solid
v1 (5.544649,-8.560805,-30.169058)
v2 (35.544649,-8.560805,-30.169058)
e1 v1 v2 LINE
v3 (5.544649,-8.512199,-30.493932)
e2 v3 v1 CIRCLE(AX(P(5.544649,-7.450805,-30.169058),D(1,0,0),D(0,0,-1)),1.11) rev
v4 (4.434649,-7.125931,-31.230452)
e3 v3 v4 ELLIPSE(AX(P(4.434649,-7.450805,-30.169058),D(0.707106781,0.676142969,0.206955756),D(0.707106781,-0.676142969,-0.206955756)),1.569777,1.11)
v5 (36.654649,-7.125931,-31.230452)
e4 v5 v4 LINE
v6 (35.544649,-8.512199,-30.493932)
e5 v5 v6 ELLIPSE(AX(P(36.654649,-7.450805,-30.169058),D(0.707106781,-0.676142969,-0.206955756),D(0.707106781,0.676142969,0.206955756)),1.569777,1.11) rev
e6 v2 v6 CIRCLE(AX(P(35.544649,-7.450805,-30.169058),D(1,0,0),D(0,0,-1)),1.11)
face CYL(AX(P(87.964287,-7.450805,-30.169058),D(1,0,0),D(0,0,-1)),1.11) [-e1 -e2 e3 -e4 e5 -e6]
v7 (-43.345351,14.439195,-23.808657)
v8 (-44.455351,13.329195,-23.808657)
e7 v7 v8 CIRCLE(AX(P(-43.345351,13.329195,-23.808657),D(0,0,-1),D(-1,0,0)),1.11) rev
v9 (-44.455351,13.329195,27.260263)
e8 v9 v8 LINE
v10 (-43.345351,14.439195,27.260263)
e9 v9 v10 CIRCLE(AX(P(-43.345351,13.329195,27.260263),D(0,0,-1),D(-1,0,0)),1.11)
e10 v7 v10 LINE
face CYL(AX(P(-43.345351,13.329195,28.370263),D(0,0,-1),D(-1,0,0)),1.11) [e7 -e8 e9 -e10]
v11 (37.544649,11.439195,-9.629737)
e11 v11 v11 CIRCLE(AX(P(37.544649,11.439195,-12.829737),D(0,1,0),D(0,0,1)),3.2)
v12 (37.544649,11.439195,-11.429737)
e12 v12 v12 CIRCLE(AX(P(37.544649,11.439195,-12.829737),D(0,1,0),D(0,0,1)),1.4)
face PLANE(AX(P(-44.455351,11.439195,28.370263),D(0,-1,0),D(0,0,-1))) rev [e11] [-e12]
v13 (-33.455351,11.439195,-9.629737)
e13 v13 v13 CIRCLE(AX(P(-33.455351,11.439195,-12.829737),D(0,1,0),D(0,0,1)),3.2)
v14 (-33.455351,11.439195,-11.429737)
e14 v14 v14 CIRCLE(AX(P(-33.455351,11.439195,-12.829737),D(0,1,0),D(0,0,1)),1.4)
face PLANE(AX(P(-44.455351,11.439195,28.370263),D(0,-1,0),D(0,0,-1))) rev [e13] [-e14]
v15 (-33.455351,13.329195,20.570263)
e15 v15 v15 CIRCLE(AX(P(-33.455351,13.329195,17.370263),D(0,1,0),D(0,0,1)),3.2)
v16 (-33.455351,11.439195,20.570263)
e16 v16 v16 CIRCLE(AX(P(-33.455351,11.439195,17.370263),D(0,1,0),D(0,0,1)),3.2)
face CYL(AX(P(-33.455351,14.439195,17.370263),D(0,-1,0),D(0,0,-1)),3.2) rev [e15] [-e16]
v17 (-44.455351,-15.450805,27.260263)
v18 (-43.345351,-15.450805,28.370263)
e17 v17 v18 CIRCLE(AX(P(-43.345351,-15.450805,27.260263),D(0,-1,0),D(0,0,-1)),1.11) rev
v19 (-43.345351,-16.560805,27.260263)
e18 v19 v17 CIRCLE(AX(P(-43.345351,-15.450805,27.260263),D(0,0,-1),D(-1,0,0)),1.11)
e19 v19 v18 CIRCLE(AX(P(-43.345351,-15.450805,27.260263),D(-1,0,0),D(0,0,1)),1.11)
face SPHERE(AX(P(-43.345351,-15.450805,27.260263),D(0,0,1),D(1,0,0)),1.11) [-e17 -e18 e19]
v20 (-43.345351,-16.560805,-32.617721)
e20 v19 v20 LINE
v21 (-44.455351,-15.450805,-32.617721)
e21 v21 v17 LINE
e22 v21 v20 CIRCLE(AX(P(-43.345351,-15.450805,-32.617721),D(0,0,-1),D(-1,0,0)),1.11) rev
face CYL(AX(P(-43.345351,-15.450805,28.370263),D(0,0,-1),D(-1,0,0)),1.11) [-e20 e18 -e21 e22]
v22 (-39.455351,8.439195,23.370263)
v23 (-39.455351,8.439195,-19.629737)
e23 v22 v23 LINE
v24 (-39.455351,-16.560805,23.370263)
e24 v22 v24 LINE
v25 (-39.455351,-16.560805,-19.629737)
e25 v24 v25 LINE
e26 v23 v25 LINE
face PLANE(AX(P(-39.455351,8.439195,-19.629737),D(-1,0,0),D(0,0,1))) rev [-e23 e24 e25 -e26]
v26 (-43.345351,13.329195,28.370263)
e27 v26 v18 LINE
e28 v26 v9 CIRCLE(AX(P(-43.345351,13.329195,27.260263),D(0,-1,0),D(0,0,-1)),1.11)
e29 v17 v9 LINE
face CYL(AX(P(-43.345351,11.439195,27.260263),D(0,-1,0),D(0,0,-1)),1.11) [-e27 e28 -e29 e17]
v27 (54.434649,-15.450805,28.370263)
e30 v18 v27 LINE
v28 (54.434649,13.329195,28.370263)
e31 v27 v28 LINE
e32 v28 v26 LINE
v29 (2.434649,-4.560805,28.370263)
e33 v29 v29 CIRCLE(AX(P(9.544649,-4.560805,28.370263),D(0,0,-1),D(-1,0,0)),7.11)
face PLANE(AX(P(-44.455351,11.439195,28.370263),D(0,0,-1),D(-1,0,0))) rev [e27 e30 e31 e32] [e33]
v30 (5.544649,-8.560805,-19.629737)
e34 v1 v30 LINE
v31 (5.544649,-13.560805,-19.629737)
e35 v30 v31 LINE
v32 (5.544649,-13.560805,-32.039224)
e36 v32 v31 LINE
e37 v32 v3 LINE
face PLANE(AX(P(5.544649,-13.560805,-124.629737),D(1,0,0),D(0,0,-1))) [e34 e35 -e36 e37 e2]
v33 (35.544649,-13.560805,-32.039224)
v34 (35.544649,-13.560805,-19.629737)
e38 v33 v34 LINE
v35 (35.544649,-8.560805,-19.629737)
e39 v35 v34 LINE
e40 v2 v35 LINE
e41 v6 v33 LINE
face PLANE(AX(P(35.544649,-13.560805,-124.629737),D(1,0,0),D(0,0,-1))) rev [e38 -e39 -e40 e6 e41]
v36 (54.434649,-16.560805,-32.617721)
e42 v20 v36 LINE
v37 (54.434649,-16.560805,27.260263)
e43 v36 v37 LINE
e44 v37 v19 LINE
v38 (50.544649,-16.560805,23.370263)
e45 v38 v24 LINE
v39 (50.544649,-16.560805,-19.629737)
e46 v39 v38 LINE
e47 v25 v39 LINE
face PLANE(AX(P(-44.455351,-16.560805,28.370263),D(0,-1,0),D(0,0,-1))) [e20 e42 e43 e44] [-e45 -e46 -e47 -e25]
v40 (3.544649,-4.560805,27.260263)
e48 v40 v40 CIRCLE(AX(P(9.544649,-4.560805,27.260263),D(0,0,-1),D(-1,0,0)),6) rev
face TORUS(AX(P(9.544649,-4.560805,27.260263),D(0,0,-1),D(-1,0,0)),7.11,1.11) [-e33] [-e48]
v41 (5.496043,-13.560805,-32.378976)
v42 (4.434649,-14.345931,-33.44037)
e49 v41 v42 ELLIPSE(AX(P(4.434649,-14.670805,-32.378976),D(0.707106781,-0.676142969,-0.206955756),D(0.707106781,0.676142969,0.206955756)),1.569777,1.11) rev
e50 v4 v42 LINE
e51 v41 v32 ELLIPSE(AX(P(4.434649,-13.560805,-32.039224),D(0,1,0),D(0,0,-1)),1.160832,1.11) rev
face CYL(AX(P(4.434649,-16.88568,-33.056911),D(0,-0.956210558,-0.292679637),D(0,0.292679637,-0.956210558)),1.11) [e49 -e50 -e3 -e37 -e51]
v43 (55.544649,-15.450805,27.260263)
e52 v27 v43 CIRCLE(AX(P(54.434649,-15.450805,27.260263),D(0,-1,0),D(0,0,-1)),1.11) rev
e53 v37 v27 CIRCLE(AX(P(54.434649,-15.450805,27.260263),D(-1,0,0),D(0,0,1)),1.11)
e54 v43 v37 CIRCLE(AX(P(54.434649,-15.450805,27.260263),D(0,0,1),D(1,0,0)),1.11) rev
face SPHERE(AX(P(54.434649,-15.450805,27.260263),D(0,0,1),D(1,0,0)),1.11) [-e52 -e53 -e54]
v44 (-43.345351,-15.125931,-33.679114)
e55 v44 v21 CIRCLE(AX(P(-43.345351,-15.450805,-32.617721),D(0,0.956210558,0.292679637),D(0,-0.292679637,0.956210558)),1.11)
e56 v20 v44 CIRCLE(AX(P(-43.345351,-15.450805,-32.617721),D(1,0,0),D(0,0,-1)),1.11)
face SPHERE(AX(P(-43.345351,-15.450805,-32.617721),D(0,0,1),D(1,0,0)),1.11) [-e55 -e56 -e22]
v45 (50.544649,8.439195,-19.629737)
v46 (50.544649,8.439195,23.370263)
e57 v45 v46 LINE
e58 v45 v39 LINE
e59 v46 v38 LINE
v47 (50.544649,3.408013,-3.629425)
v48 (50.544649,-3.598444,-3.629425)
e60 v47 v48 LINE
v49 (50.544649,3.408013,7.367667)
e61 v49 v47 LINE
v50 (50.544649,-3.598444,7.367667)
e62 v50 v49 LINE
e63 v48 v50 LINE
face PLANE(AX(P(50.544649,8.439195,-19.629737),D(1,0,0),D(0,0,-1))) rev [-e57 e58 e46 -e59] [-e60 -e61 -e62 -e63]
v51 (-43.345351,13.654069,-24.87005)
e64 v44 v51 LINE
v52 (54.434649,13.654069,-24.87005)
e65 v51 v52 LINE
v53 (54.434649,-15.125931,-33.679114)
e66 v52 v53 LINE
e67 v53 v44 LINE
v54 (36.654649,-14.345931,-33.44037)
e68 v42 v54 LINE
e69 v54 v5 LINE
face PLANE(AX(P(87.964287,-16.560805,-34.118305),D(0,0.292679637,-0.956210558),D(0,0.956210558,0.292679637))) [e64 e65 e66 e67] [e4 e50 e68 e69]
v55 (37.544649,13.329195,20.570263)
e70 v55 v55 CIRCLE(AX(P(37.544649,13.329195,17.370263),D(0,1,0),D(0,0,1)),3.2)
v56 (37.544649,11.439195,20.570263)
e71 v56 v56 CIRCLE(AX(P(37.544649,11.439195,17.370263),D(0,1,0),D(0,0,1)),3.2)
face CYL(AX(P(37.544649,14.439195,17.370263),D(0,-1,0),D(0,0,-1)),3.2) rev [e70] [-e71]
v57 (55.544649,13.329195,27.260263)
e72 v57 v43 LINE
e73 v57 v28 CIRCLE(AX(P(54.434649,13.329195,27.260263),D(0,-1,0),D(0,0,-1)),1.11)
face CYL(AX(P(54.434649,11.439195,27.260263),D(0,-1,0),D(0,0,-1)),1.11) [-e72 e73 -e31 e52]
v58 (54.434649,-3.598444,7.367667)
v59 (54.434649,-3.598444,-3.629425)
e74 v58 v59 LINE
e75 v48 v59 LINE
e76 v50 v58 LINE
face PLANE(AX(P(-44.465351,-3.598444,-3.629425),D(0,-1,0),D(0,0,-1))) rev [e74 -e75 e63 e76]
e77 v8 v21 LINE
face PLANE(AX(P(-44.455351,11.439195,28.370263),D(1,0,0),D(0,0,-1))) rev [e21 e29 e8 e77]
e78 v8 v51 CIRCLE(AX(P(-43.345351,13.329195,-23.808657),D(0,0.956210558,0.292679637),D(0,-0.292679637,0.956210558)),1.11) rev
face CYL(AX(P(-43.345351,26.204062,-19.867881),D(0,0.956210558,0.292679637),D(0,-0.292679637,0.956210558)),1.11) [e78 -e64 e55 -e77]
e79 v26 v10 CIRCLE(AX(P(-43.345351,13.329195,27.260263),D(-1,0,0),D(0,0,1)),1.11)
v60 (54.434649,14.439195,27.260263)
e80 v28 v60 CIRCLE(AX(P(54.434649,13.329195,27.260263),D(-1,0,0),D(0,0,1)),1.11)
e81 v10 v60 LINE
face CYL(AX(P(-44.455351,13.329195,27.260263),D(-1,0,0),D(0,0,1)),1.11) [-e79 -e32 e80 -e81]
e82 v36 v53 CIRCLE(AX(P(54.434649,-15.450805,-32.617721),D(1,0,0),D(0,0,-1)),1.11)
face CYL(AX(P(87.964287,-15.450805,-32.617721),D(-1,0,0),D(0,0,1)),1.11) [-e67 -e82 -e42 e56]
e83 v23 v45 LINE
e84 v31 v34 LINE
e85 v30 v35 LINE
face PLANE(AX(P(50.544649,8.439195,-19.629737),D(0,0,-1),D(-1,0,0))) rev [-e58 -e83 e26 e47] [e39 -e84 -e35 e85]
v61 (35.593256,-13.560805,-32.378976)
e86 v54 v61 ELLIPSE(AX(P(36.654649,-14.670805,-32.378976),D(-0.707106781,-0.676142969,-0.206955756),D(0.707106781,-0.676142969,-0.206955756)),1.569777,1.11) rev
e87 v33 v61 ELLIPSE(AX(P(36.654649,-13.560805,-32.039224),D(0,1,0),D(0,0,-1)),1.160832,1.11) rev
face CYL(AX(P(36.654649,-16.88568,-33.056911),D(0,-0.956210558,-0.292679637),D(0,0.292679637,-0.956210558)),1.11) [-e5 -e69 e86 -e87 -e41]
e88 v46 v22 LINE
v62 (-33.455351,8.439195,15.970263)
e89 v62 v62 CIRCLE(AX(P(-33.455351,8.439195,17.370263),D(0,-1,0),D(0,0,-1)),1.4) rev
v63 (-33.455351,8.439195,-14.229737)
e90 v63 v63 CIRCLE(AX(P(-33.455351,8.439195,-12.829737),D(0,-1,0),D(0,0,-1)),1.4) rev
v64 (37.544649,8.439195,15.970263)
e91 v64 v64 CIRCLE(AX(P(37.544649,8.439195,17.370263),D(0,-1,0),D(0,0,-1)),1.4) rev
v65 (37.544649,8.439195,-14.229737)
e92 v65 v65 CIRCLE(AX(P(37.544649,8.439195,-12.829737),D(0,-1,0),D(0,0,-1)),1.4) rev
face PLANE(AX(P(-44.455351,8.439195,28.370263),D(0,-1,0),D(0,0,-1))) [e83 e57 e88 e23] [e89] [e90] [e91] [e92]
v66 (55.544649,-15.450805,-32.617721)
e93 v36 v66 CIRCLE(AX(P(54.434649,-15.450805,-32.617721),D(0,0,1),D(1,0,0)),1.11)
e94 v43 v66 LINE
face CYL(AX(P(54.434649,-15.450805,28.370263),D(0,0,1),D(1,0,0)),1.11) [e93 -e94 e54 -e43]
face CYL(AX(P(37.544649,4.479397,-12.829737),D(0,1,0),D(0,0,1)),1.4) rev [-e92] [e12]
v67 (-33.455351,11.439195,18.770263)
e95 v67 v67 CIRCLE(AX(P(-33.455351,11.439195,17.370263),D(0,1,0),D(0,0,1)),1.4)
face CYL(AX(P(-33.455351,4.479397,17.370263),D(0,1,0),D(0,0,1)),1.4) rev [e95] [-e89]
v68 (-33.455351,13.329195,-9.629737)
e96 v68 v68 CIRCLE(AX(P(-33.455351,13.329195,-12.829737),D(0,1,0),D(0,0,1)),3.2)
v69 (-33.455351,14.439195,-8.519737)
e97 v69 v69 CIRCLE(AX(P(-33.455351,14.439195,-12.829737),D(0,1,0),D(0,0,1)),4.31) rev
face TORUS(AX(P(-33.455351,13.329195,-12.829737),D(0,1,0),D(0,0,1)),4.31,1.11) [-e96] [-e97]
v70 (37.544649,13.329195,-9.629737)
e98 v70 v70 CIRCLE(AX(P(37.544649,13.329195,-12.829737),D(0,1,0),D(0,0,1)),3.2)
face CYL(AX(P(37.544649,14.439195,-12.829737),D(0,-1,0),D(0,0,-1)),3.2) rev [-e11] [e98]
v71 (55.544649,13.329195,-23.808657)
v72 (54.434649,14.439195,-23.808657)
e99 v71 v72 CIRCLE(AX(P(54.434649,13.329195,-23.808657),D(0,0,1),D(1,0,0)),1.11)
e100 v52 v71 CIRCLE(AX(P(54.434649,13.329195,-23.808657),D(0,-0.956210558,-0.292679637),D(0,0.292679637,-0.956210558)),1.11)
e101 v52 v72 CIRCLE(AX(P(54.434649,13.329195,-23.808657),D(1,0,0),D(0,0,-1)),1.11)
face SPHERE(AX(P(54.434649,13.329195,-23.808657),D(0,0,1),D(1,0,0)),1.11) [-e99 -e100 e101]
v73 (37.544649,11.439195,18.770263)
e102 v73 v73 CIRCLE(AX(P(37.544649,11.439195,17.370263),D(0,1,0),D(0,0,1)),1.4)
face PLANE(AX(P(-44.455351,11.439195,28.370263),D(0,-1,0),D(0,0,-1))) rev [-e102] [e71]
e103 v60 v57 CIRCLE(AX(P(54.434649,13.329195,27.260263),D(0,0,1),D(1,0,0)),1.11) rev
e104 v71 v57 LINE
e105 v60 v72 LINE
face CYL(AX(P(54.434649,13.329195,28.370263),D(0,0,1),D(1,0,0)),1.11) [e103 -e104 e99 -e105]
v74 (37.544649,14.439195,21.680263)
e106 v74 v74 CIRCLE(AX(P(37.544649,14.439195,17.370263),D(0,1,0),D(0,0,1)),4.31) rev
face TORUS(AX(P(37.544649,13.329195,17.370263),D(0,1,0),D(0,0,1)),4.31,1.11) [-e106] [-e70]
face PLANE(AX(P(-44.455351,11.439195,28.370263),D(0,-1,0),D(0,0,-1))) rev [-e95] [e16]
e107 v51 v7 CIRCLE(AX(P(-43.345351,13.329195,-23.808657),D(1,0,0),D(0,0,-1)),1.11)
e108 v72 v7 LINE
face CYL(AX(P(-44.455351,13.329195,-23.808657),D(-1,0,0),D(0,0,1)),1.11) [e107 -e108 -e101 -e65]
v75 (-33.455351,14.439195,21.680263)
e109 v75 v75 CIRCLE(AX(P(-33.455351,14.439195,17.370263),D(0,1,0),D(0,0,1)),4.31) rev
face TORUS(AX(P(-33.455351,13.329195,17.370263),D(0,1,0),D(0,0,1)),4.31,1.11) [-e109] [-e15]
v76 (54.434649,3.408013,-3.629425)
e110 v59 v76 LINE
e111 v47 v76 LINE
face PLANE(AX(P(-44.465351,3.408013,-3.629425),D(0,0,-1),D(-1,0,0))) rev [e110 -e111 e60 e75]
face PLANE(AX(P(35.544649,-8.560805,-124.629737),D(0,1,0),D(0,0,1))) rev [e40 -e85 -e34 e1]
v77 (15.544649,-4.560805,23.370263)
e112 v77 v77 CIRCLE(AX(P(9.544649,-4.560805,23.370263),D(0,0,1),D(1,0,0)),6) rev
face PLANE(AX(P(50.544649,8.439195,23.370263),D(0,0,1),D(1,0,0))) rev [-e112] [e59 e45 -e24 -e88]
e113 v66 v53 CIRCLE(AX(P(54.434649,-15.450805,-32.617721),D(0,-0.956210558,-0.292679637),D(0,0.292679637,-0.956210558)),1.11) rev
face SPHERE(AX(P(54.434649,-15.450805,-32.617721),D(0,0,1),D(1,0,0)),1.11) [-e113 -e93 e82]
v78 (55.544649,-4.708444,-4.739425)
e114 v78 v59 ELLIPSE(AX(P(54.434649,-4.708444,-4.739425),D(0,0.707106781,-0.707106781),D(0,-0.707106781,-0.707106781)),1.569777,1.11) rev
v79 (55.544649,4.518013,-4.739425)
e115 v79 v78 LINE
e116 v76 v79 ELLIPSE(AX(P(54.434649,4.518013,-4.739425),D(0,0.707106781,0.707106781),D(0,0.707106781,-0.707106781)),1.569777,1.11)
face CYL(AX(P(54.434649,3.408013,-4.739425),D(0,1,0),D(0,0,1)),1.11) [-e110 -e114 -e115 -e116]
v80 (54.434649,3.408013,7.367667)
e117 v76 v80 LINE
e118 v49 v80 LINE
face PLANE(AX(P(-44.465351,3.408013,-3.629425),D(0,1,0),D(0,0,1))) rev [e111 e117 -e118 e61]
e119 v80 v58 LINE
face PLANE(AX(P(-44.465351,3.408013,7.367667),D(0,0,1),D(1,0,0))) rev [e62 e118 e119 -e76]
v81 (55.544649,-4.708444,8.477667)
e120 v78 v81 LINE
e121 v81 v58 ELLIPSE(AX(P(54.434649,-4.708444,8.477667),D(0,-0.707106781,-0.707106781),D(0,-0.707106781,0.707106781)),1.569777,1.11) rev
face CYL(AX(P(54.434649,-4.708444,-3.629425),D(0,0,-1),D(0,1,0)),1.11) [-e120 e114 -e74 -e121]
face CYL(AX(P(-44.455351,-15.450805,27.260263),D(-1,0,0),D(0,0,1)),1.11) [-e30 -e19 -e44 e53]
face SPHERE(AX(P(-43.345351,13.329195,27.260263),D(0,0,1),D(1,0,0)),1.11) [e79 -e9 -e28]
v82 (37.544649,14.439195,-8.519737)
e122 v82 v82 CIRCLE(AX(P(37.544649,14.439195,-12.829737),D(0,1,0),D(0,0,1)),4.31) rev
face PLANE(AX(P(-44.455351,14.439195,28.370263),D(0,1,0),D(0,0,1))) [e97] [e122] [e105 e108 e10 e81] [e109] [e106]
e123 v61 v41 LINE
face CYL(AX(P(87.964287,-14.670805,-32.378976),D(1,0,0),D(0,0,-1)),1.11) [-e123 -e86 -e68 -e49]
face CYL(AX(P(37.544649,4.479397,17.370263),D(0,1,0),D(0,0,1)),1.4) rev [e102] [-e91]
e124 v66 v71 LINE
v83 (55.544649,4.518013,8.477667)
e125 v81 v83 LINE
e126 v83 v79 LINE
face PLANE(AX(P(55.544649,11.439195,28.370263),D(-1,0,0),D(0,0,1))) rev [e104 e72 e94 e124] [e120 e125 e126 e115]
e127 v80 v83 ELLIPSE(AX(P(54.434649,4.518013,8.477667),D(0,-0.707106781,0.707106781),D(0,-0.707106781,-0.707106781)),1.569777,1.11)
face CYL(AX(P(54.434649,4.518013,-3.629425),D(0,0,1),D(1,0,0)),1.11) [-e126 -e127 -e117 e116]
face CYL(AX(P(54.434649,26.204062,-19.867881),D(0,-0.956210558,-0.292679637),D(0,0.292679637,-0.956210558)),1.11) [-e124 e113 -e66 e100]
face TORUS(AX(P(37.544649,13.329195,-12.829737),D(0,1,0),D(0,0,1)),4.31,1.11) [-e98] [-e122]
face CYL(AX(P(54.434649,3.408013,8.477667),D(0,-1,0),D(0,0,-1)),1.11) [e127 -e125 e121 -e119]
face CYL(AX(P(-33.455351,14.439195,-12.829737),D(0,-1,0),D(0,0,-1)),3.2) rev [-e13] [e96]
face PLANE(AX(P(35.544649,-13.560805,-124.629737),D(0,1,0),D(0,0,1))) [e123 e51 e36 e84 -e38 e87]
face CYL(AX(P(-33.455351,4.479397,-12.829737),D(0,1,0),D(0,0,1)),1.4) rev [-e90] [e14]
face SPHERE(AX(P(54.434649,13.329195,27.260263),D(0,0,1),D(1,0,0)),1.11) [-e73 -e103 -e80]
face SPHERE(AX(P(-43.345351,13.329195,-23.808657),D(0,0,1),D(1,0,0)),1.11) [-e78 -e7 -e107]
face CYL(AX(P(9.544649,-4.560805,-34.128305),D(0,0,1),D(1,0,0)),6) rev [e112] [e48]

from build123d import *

# Parameters (mm, degrees)
SKETCH_1_W                      = 10
SKETCH_1_H                      = 5.3
EXTRUDE_1_DEPTH                 = 2.8
CUT_EXTRUDE_1_DEPTH             = 2.5
SKETCH_4_R                      = 0.13999999999999993
SKETCH_4_R_2                    = 0.13999999999999987
CUT_EXTRUDE_2_DEPTH             = 0.3
CUT_EXTRUDE_3_REACH             = 13.659
CUT_EXTRUDE_4_REACH             = 13.659
SKETCH_7_W                      = 3
SKETCH_7_H                      = 0.5
CUT_EXTRUDE_4_DIRECTION_2_DEPTH = 10
SKETCH_8_W                      = 10
SKETCH_8_H                      = 5.3
SKETCH_8_R                      = 0.3200000000000004
SKETCH_8_R_2                    = 0.3200000000000005
SKETCH_8_R_3                    = 0.32
EXTRUDE_4_DEPTH                 = 0.3
EXTRUDE_5_DEPTH                 = 10
CUT_EXTRUDE_5_REACH             = 13.517
SKETCH_10_W                     = 3.000000000000001
SKETCH_10_H                     = 0.5000000000000002
CUT_EXTRUDE_6_REACH             = 14.193
SKETCH_11_R                     = 0.6000000000000002
SCALE_1_SCALE                   = 10
FILLET_1_R                      = 1.11
FILLET_2_R                      = 1.11
FILLET_3_R                      = 1.11
FILLET_4_R                      = 1.11
FILLET_5_R                      = 1.11


with BuildPart() as part:
    # 草圖1 → 填料-伸長1 (new body)
    with BuildSketch(Plane(origin=(0, 0, 0), x_dir=(1, 0, 0), z_dir=(0, 1, 0))):
        with Locations((5, 2.65)):
            Rectangle(SKETCH_1_W, SKETCH_1_H)
    extrude(amount=EXTRUDE_1_DEPTH)

    # 草圖3 → 除料-伸長1 (cut)
    with BuildSketch(Plane.XZ):
        Polygon((9.5, -4.799999999999999), (0.5000000000000004, -4.8), (0.5000000000000004, -0.5000000000000011), (9.5, -0.5), align=None)
    extrude(amount=-CUT_EXTRUDE_1_DEPTH, mode=Mode.SUBTRACT)

    # 草圖4 → 除料-伸長2 (cut)
    with BuildSketch(Plane(origin=(0, 2.8, 0), x_dir=(1, 0, 0), z_dir=(0, 1, 0))):
        with Locations(Location((1.1, 1.1, 0), (0, 0, 270))):
            Circle(SKETCH_4_R)
        with Locations(Location((1.1, 4.12, 0), (0, 0, 270))):
            Circle(SKETCH_4_R)
        with Locations(Location((8.2, 1.1, 0), (0, 0, 270))):
            Circle(SKETCH_4_R_2)
        with Locations(Location((8.2, 4.12, 0), (0, 0, 270))):
            Circle(SKETCH_4_R)
    extrude(amount=-CUT_EXTRUDE_2_DEPTH, mode=Mode.SUBTRACT)

    # 草圖5 → 除料-伸長3 (cut, up to next)
    with BuildSketch(Plane(origin=(10, 0, 0), x_dir=(0, 0, -1), z_dir=(1, 0, 0)), mode=Mode.PRIVATE) as cut_extrude_3_sk1:
        Polygon((3.199968847141929, 1.9968818566740154), (2.100259628985645, 1.9968818566740154), (2.100259628985645, 1.296236122516535), (3.199968847141929, 1.2962361225165353), align=None)
    cut_extrude_3_tool1 = extrude(cut_extrude_3_sk1.sketch, amount=-CUT_EXTRUDE_3_REACH, mode=Mode.PRIVATE) & part.part
    add(cut_extrude_3_tool1.solids().sort_by_distance((10, 1.646559, -2.650114))[0], mode=Mode.SUBTRACT)

    # 草圖7 → 除料-伸長4 (cut, up to next)
    with BuildSketch(Plane(origin=(0, 0, -5.3), x_dir=(-1, 0, 0), z_dir=(0, 0, -1)), mode=Mode.PRIVATE) as cut_extrude_4_sk1:
        with Locations((-6.5, 0.55)):
            Rectangle(SKETCH_7_W, SKETCH_7_H)
    cut_extrude_4_tool1 = extrude(cut_extrude_4_sk1.sketch, amount=-CUT_EXTRUDE_4_REACH, mode=Mode.PRIVATE) & part.part
    add(cut_extrude_4_tool1.solids().sort_by_distance((6.5, 0.55, -5.3))[0], mode=Mode.SUBTRACT)

    # 草圖7 → 除料-伸長4 direction 2 (cut)
    with BuildSketch(Plane(origin=(0, 0, -5.3), x_dir=(-1, 0, 0), z_dir=(0, 0, -1))):
        with Locations((-6.5, 0.55)):
            Rectangle(SKETCH_7_W, SKETCH_7_H)
    extrude(amount=CUT_EXTRUDE_4_DIRECTION_2_DEPTH, mode=Mode.SUBTRACT)

    # 草圖8 → 填料-伸長4 (add)
    with BuildSketch(Plane(origin=(0, 2.8, 0), x_dir=(1, 0, 0), z_dir=(0, 1, 0))):
        with Locations((5, 2.65)):
            Rectangle(SKETCH_8_W, SKETCH_8_H)
        with Locations(Location((8.2, 1.1, 0), (0, 0, 270))):
            Circle(SKETCH_8_R, mode=Mode.SUBTRACT)
        with Locations(Location((8.2, 4.12, 0), (0, 0, 270))):
            Circle(SKETCH_8_R_2, mode=Mode.SUBTRACT)
        with Locations(Location((1.1000000000000003, 4.12, 0), (0, 0, 270))):
            Circle(SKETCH_8_R_3, mode=Mode.SUBTRACT)
        with Locations(Location((1.1000000000000003, 1.1, 0), (0, 0, 270))):
            Circle(SKETCH_8_R, mode=Mode.SUBTRACT)
    extrude(amount=EXTRUDE_4_DEPTH)

    # 草圖9 → 填料-伸長5 (add)
    with BuildSketch(Plane.ZY):
        Polygon((-5.3, 0), (-6.248856782761436, 0), (-5.3, 3.1), align=None)
    extrude(amount=-EXTRUDE_5_DEPTH)

    # 草圖10 → 除料-伸長5 (cut, up to next)
    with BuildSketch(Plane.XY.offset(-4.8), mode=Mode.PRIVATE) as cut_extrude_5_sk1:
        with Locations((6.5, 0.5500000000000002)):
            Rectangle(SKETCH_10_W, SKETCH_10_H)
    cut_extrude_5_tool1 = extrude(cut_extrude_5_sk1.sketch, amount=-CUT_EXTRUDE_5_REACH, mode=Mode.PRIVATE) & part.part
    add(cut_extrude_5_tool1.solids().sort_by_distance((6.5, 0.55, -4.8))[0], mode=Mode.SUBTRACT)

    # 草圖11 → 除料-伸長6 (cut, up to next)
    with BuildSketch(Plane.XY, mode=Mode.PRIVATE) as cut_extrude_6_sk1:
        with Locations((5.4, 1.2)):
            Circle(SKETCH_11_R)
    cut_extrude_6_tool1 = extrude(cut_extrude_6_sk1.sketch, amount=-CUT_EXTRUDE_6_REACH, mode=Mode.PRIVATE) & part.part
    add(cut_extrude_6_tool1.solids().sort_by_distance((5.4, 1.2, 0))[0], mode=Mode.SUBTRACT)


with BuildPart() as part_1:
    # 縮放比例1: scaled about (4.939483412, 1.840089484, -3.152251455)
    add(part.part.scale(SCALE_1_SCALE).moved(Location((-44.455350708000005, -16.560805356, 28.370263095))))

    # 圓角1
    fillet_1_edges = [part_1.edges().sort_by_distance(p)[0] for p in [
        (-44.455350708000005, -1.0608053559999977, -29.374020818807182),
        (-44.455350708000005, -16.560805356, -2.874020818807182),
        (-44.455350708000005, 14.439194644, 1.8702630949999985),
        (-44.455350708000005, -1.0608053560000013, 28.370263095),
    ]]
    fillet(fillet_1_edges, radius=FILLET_1_R)

    # 圓角2
    fillet_2_edges = [part_1.edges().sort_by_distance(p)[0] for p in [
        (55.544649291999995, -1.0608053559999977, -29.374020818807182),
        (55.544649291999995, -0.09521546004724613, -3.6294253764192916),
        (55.544649291999995, 3.4080132107401546, 1.8691207143621291),
        (55.544649291999995, -0.09521546004724613, 7.367666805143546),
        (55.544649291999995, -3.598444130834647, 1.8691207143621256),
        (55.544649291999995, -16.560805356, -2.874020818807182),
        (55.544649291999995, -1.0608053560000013, 28.370263095),
        (55.544649291999995, 14.439194644, 1.8702630949999985),
    ]]
    fillet(fillet_2_edges, radius=FILLET_2_R)

    # 圓角3
    # the kernel refuses this fillet: 1.11 mm, written as the material it takes off along each edge
    with BuildSketch(Plane(origin=(-43.345350708000005, 13.329194644000001, 27.260263095), x_dir=(0, 1, 0), z_dir=(0, 0, 1))) as fillet_3_piece_1_section:
        Polygon((0, 0), (FILLET_3_R, 0), (FILLET_3_R, FILLET_3_R), (0, FILLET_3_R), align=None)
    fillet_3_piece_1 = extrude(amount=FILLET_3_R, mode=Mode.PRIVATE)
    fillet_3_piece_1 = fillet_3_piece_1 - Plane(origin=(-43.345350708000005, 13.329194644000001, 27.260263095), x_dir=(0.7071067811865475, -0.7071067811865475, 0), z_dir=(0, 0, 1)) * Sphere(FILLET_3_R, mode=Mode.PRIVATE)
    add(fillet_3_piece_1, mode=Mode.SUBTRACT)
    with BuildSketch(Plane(origin=(-43.345350708000005, -15.450805356, 27.260263095), x_dir=(0, -1, 0), z_dir=(0, 0, 1))) as fillet_3_piece_2_section:
        Polygon((0, 0), (FILLET_3_R, 0), (FILLET_3_R, -FILLET_3_R), (0, -FILLET_3_R), align=None)
    fillet_3_piece_2 = extrude(amount=FILLET_3_R, mode=Mode.PRIVATE)
    fillet_3_piece_2 = fillet_3_piece_2 - Plane(origin=(-43.345350708000005, -15.450805356, 27.260263095), x_dir=(0.7071067811865475, 0.7071067811865475, 0), z_dir=(0, 0, 1)) * Sphere(FILLET_3_R, mode=Mode.PRIVATE)
    add(fillet_3_piece_2, mode=Mode.SUBTRACT)
    with BuildSketch(Plane(origin=(54.434649291999996, 13.329194644000001, 27.260263095), x_dir=(0, 1, 0), z_dir=(0, 0, 1))) as fillet_3_piece_3_section:
        Polygon((0, 0), (FILLET_3_R, 0), (FILLET_3_R, -FILLET_3_R), (0, -FILLET_3_R), align=None)
    fillet_3_piece_3 = extrude(amount=FILLET_3_R, mode=Mode.PRIVATE)
    fillet_3_piece_3 = fillet_3_piece_3 - Plane(origin=(54.434649291999996, 13.329194644000001, 27.260263095), x_dir=(-0.7071067811865475, -0.7071067811865475, 0), z_dir=(0, 0, 1)) * Sphere(FILLET_3_R, mode=Mode.PRIVATE)
    add(fillet_3_piece_3, mode=Mode.SUBTRACT)
    with BuildSketch(Plane(origin=(54.434649291999996, -15.450805356, 27.260263095), x_dir=(0, -1, 0), z_dir=(0, 0, 1))) as fillet_3_piece_4_section:
        Polygon((0, 0), (FILLET_3_R, 0), (FILLET_3_R, FILLET_3_R), (0, FILLET_3_R), align=None)
    fillet_3_piece_4 = extrude(amount=FILLET_3_R, mode=Mode.PRIVATE)
    fillet_3_piece_4 = fillet_3_piece_4 - Plane(origin=(54.434649291999996, -15.450805356, 27.260263095), x_dir=(-0.7071067811865475, 0.7071067811865475, 0), z_dir=(0, 0, 1)) * Sphere(FILLET_3_R, mode=Mode.PRIVATE)
    add(fillet_3_piece_4, mode=Mode.SUBTRACT)
    with BuildSketch(Plane(origin=(9.544649291999995, -4.5608053559999995, 28.370263095), x_dir=(1, 0, 0), z_dir=(0, -1, 0))) as fillet_3_piece_5:
        with BuildLine():
            CenterArc((6 + FILLET_3_R, -FILLET_3_R), FILLET_3_R, 90, 90)
            Line((6, -FILLET_3_R), (6, 0))
            Line((6, 0), (6 + FILLET_3_R, 0))
        make_face()
    revolve(axis=Axis((9.544649291999995, -4.5608053559999995, 28.370263095), (0, 0, 1)), mode=Mode.SUBTRACT)
    with BuildSketch(Plane(origin=(54.434649291999996, 14.439194644, 28.370263095), x_dir=(0, -1, 0), z_dir=(-1, 0, 0)), Plane(origin=(-43.345350708000005, -16.560805356, 28.370263095), x_dir=(0, 1, 0), z_dir=(1, 0, 0))) as fillet_3_piece_6:
        with BuildLine():
            CenterArc((FILLET_3_R, -FILLET_3_R), FILLET_3_R, 90, 90)
            Line((0, -FILLET_3_R), (0, 0))
            Line((0, 0), (FILLET_3_R, 0))
        make_face()
    extrude(amount=97.78, mode=Mode.SUBTRACT)

    # 圓角4
    # the kernel refuses this fillet: 1.11 mm, written as the material it takes off along each edge
    with BuildSketch(Plane(origin=(-43.345350708000005, 13.329194644000001, -23.80865665520716), x_dir=(0, 1, 0), z_dir=(-1, 0, 0))) as fillet_4_piece_1_section:
        Polygon((0, 0), (FILLET_4_R, 0), (FILLET_4_R, FILLET_4_R * 0.73971193675), (FILLET_4_R * 0.292679636539, FILLET_4_R * 0.956210557542), align=None)
    fillet_4_piece_1 = extrude(amount=FILLET_4_R, mode=Mode.PRIVATE)
    fillet_4_piece_1 = fillet_4_piece_1 - Plane(origin=(-43.345350708000005, 13.329194644000001, -23.80865665520716), x_dir=(0, -0.8039526219060927, 0.5946933510056414), z_dir=(-1, 0, 0)) * Sphere(FILLET_4_R, mode=Mode.PRIVATE)
    add(fillet_4_piece_1, mode=Mode.SUBTRACT)
    with BuildSketch(Plane(origin=(54.434649291999996, 13.329194644000001, -23.80865665520716), x_dir=(0, 1, 0), z_dir=(1, 0, 0))) as fillet_4_piece_2_section:
        Polygon((0, 0), (FILLET_4_R, 0), (FILLET_4_R, -FILLET_4_R * 0.73971193675), (FILLET_4_R * 0.292679636539, -FILLET_4_R * 0.956210557542), align=None)
    fillet_4_piece_2 = extrude(amount=FILLET_4_R, mode=Mode.PRIVATE)
    fillet_4_piece_2 = fillet_4_piece_2 - Plane(origin=(54.434649291999996, 13.329194644000001, -23.80865665520716), x_dir=(0, -0.8039526219060927, 0.5946933510056414), z_dir=(1, 0, 0)) * Sphere(FILLET_4_R, mode=Mode.PRIVATE)
    add(fillet_4_piece_2, mode=Mode.SUBTRACT)
    with BuildSketch(Plane(origin=(-43.345350708000005, 14.439194644, -24.629736905), x_dir=(0, 0, 1), z_dir=(1, 0, 0))) as fillet_4_piece_3:
        with BuildLine():
            CenterArc((FILLET_4_R * 0.73971193675, FILLET_4_R), FILLET_4_R, 197.01845025050858, 72.98154974949142)
            Line((-FILLET_4_R * 0.216498620792, FILLET_4_R * 0.707320363461), (0, 0))
            Line((0, 0), (FILLET_4_R * 0.73971193675, 0))
        make_face()
    extrude(amount=97.78, mode=Mode.SUBTRACT)
    with BuildSketch(Plane(origin=(37.544649291999995, 14.439194644, 17.370263095), x_dir=(0, 0, 1), z_dir=(-1, 0, 0))) as fillet_4_piece_4:
        with BuildLine():
            CenterArc((3.200000000000003 + FILLET_4_R, -FILLET_4_R), FILLET_4_R, 90, 90)
            Line((3.200000000000003, -FILLET_4_R), (3.200000000000003, 0))
            Line((3.200000000000003, 0), (3.200000000000003 + FILLET_4_R, 0))
        make_face()
    revolve(axis=Axis((37.544649291999995, 14.439194644, 17.370263095), (0, 1, 0)), mode=Mode.SUBTRACT)
    with BuildSketch(Plane(origin=(37.544649291999995, 14.439194644, -12.829736905000004), x_dir=(0, 0, 1), z_dir=(-1, 0, 0))) as fillet_4_piece_5:
        with BuildLine():
            CenterArc((3.200000000000003 + FILLET_4_R, -FILLET_4_R), FILLET_4_R, 90, 90)
            Line((3.200000000000003, -FILLET_4_R), (3.200000000000003, 0))
            Line((3.200000000000003, 0), (3.200000000000003 + FILLET_4_R, 0))
        make_face()
    revolve(axis=Axis((37.544649291999995, 14.439194644, -12.829736905000004), (0, 1, 0)), mode=Mode.SUBTRACT)
    with BuildSketch(Plane(origin=(-33.455350708, 14.439194644, -12.829736905000004), x_dir=(0, 0, 1), z_dir=(-1, 0, 0))) as fillet_4_piece_6:
        with BuildLine():
            CenterArc((3.200000000000003 + FILLET_4_R, -FILLET_4_R), FILLET_4_R, 90, 90)
            Line((3.200000000000003, -FILLET_4_R), (3.200000000000003, 0))
            Line((3.200000000000003, 0), (3.200000000000003 + FILLET_4_R, 0))
        make_face()
    revolve(axis=Axis((-33.455350708, 14.439194644, -12.829736905000004), (0, 1, 0)), mode=Mode.SUBTRACT)
    with BuildSketch(Plane(origin=(-33.455350708, 14.439194644, 17.370263095), x_dir=(0, 0, 1), z_dir=(-1, 0, 0))) as fillet_4_piece_7:
        with BuildLine():
            CenterArc((3.200000000000003 + FILLET_4_R, -FILLET_4_R), FILLET_4_R, 90, 90)
            Line((3.200000000000003, -FILLET_4_R), (3.200000000000003, 0))
            Line((3.200000000000003, 0), (3.200000000000003 + FILLET_4_R, 0))
        make_face()
    revolve(axis=Axis((-33.455350708, 14.439194644, 17.370263095), (0, 1, 0)), mode=Mode.SUBTRACT)

    # 圓角5
    # the kernel refuses this fillet: 1.11 mm, written as the material it takes off along each edge
    with BuildSketch(Plane(origin=(-43.345350708000005, -15.450805356, -32.61772059323107), x_dir=(0, -1, 0), z_dir=(-1, 0, 0))) as fillet_5_piece_1_section:
        Polygon((0, 0), (FILLET_5_R, 0), (FILLET_5_R, -FILLET_5_R * 1.35187760305), (-FILLET_5_R * 0.292679636539, -FILLET_5_R * 0.956210557542), align=None)
    fillet_5_piece_1 = extrude(amount=FILLET_5_R, mode=Mode.PRIVATE)
    fillet_5_piece_1 = fillet_5_piece_1 - Plane(origin=(-43.345350708000005, -15.450805356, -32.61772059323107), x_dir=(0, 0.5946933510056415, 0.8039526219060928), z_dir=(-1, 0, 0)) * Sphere(FILLET_5_R, mode=Mode.PRIVATE)
    add(fillet_5_piece_1, mode=Mode.SUBTRACT)
    with BuildSketch(Plane(origin=(54.434649291999996, -15.450805356, -32.61772059323107), x_dir=(0, -1, 0), z_dir=(1, 0, 0))) as fillet_5_piece_2_section:
        Polygon((0, 0), (FILLET_5_R, 0), (FILLET_5_R, FILLET_5_R * 1.35187760305), (-FILLET_5_R * 0.292679636539, FILLET_5_R * 0.956210557542), align=None)
    fillet_5_piece_2 = extrude(amount=FILLET_5_R, mode=Mode.PRIVATE)
    fillet_5_piece_2 = fillet_5_piece_2 - Plane(origin=(54.434649291999996, -15.450805356, -32.61772059323107), x_dir=(0, 0.5946933510056415, 0.8039526219060928), z_dir=(1, 0, 0)) * Sphere(FILLET_5_R, mode=Mode.PRIVATE)
    add(fillet_5_piece_2, mode=Mode.SUBTRACT)
    with BuildSketch(Plane(origin=(5.5446492919999955, -5.907321058820363, -30.85745607602683), x_dir=(-1, 0, 0), z_dir=(0, -0.9562105575422115, -0.29267963653936196))) as fillet_5_piece_3_section:
        with BuildLine():
            CenterArc((FILLET_5_R, -FILLET_5_R), FILLET_5_R, 90, 90)
            Line((-8.9e-16, -FILLET_5_R), (0, 0))
            Line((0, 0), (FILLET_5_R, 0))
        make_face()
    fillet_5_piece_3 = extrude(amount=10.778973849495777, mode=Mode.PRIVATE)
    fillet_5_piece_3 = split(fillet_5_piece_3, bisect_by=Plane(origin=(5.29335071516381, -8.560805355999998, -32.17204241302191), z_dir=(0, -1, 0)), keep=Keep.TOP, mode=Mode.PRIVATE)
    fillet_5_piece_3 = split(fillet_5_piece_3, bisect_by=Plane(origin=(5.293350715163811, -13.560805356, -32.17204241302191), z_dir=(0, 1, 0)), keep=Keep.TOP, mode=Mode.PRIVATE)
    add(fillet_5_piece_3, mode=Mode.SUBTRACT)
    with BuildSketch(Plane(origin=(35.544649291999995, -8.560805355999998, -31.669642067423553), x_dir=(0, 0.9562105575422125, 0.29267963653935886), z_dir=(-1, 0, 0))) as fillet_5_piece_4:
        with BuildLine():
            CenterArc((FILLET_5_R * 1.35187760305, -FILLET_5_R), FILLET_5_R, 89.99999999999982, 107.01845025050886)
            Line((FILLET_5_R * 0.395667045506, -FILLET_5_R * 1.29267963654), (0, 0))
            Line((0, 0), (FILLET_5_R * 1.35187760305, -2e-17))
        make_face()
    extrude(amount=30, mode=Mode.SUBTRACT)
    with BuildSketch(Plane(origin=(35.544649291999995, -16.214289653179637, -34.01224222456454), x_dir=(1, 0, 0), z_dir=(0, 0.9562105575422115, 0.29267963653936196))) as fillet_5_piece_5_section:
        with BuildLine():
            CenterArc((FILLET_5_R, -FILLET_5_R), FILLET_5_R, 90, 90)
            Line((0, -FILLET_5_R), (0, 0))
            Line((0, 0), (FILLET_5_R, 0))
        make_face()
    fillet_5_piece_5 = extrude(amount=10.778973849495781, mode=Mode.PRIVATE)
    fillet_5_piece_5 = split(fillet_5_piece_5, bisect_by=Plane(origin=(35.79594786883617, -8.560805355999998, -32.1720424130219), z_dir=(0, -1, 0)), keep=Keep.TOP, mode=Mode.PRIVATE)
    fillet_5_piece_5 = split(fillet_5_piece_5, bisect_by=Plane(origin=(35.79594786883617, -13.560805356, -32.1720424130219), z_dir=(0, 1, 0)), keep=Keep.TOP, mode=Mode.PRIVATE)
    add(fillet_5_piece_5, mode=Mode.SUBTRACT)
    with BuildSketch(Plane(origin=(5.544649291999988, -13.560805356, -33.200056233167814), x_dir=(0, -0.9562105575422132, -0.29267963653935636), z_dir=(1, 0, 0))) as fillet_5_piece_6:
        with BuildLine():
            CenterArc((FILLET_5_R * 0.73971193675, -FILLET_5_R), FILLET_5_R, 90.0000000000003, 72.98154974949095)
            Line((-FILLET_5_R * 0.216498620792, -FILLET_5_R * 0.707320363461), (0, 0))
            Line((0, 0), (FILLET_5_R * 0.73971193675, -2e-17))
        make_face()
    extrude(amount=30.000000000000007, mode=Mode.SUBTRACT)
    with BuildSketch(Plane(origin=(-43.345350708000005, -16.560805356, -34.11830473261436), x_dir=(0, 0, 1), z_dir=(1, 0, 0))) as fillet_5_piece_7:
        with BuildLine():
            CenterArc((FILLET_5_R * 1.35187760305, -FILLET_5_R), FILLET_5_R, 90, 107.01845025050858)
            Line((FILLET_5_R * 0.395667045506, -FILLET_5_R * 1.29267963654), (0, 0))
            Line((0, 0), (FILLET_5_R * 1.35187760305, 0))
        make_face()
    extrude(amount=97.78, mode=Mode.SUBTRACT)
    with BuildSketch(Plane(origin=(35.544649291999995, -8.560805355999998, -31.669642067423553), x_dir=(0, 0.9562105575422125, 0.29267963653935886), z_dir=(-1, 0, 0))) as fillet_5_piece_8a_section:
        with BuildLine():
            CenterArc((FILLET_5_R * 1.35187760305, -FILLET_5_R), FILLET_5_R, 89.99999999999982, 107.01845025050886)
            Line((FILLET_5_R * 0.395667045506, -FILLET_5_R * 1.29267963654), (0, 0))
            Line((0, 0), (FILLET_5_R * 1.35187760305, -2e-17))
        make_face()
    fillet_5_piece_8a = extrude(amount=33.75146034845822, mode=Mode.PRIVATE)
    fillet_5_piece_8a = split(fillet_5_piece_8a, bisect_by=Plane(origin=(5.5446492919999955, -8.22260760341926, -31.21244010030849), z_dir=(-1, 0, 0)), keep=Keep.TOP, mode=Mode.PRIVATE)
    with BuildSketch(Plane(origin=(5.5446492919999955, -5.907321058820363, -30.85745607602683), x_dir=(-1, 0, 0), z_dir=(0, -0.9562105575422115, -0.29267963653936196))) as fillet_5_piece_8b_section:
        with BuildLine():
            CenterArc((FILLET_5_R, -FILLET_5_R), FILLET_5_R, 90, 90)
            Line((-8.9e-16, -FILLET_5_R), (0, 0))
            Line((0, 0), (FILLET_5_R, 0))
        make_face()
    fillet_5_piece_8b = extrude(amount=10.778973849495777, mode=Mode.PRIVATE)
    fillet_5_piece_8b = split(fillet_5_piece_8b, bisect_by=Plane(origin=(5.289512950668513, -8.560805355999998, -31.018501317013534), z_dir=(0, 1, 0)), keep=Keep.TOP, mode=Mode.PRIVATE)
    fillet_5_piece_8 = fillet_5_piece_8a & fillet_5_piece_8b
    add(fillet_5_piece_8, mode=Mode.SUBTRACT)
    with BuildSketch(Plane(origin=(5.5446492919999955, -5.907321058820363, -30.85745607602683), x_dir=(-1, 0, 0), z_dir=(0, -0.9562105575422115, -0.29267963653936196))) as fillet_5_piece_9a_section:
        with BuildLine():
            CenterArc((FILLET_5_R, -FILLET_5_R), FILLET_5_R, 90, 90)
            Line((-8.9e-16, -FILLET_5_R), (0, 0))
            Line((0, 0), (FILLET_5_R, 0))
        make_face()
    fillet_5_piece_9a = extrude(amount=10.778973849495777, mode=Mode.PRIVATE)
    fillet_5_piece_9a = split(fillet_5_piece_9a, bisect_by=Plane(origin=(5.29698146540283, -13.560805356, -33.34844666341145), z_dir=(0, -1, 0)), keep=Keep.TOP, mode=Mode.PRIVATE)
    with BuildSketch(Plane(origin=(3.4919486675178817, -13.560805356, -33.200056233167814), x_dir=(0, -0.9562105575422132, -0.29267963653935636), z_dir=(1, 0, 0))) as fillet_5_piece_9b_section:
        with BuildLine():
            CenterArc((FILLET_5_R * 0.73971193675, -FILLET_5_R), FILLET_5_R, 90.0000000000003, 72.98154974949095)
            Line((-FILLET_5_R * 0.216498620792, -FILLET_5_R * 0.707320363461), (0, 0))
            Line((0, 0), (FILLET_5_R * 0.73971193675, -2e-17))
        make_face()
    fillet_5_piece_9b = extrude(amount=32.052700624482114, mode=Mode.PRIVATE)
    fillet_5_piece_9b = split(fillet_5_piece_9b, bisect_by=Plane(origin=(5.5446492919999955, -13.733631636877407, -33.07221457021865), z_dir=(-1, 0, 0)), keep=Keep.TOP, mode=Mode.PRIVATE)
    fillet_5_piece_9 = fillet_5_piece_9a & fillet_5_piece_9b
    add(fillet_5_piece_9, mode=Mode.SUBTRACT)
    with BuildSketch(Plane(origin=(39.29610964045822, -8.560805355999998, -31.66964206742356), x_dir=(0, 0.9562105575422111, 0.2926796365393635), z_dir=(-1, 0, 0))) as fillet_5_piece_10a_section:
        with BuildLine():
            CenterArc((FILLET_5_R * 1.35187760305, -FILLET_5_R), FILLET_5_R, 90.00000000000009, 107.01845025050852)
            Line((FILLET_5_R * 0.395667045506, -FILLET_5_R * 1.29267963654), (0, 0))
            Line((0, 0), (FILLET_5_R * 1.35187760305, -1e-17))
        make_face()
    fillet_5_piece_10a = extrude(amount=33.751460348458224, mode=Mode.PRIVATE)
    fillet_5_piece_10a = split(fillet_5_piece_10a, bisect_by=Plane(origin=(35.544649291999995, -8.222607603419256, -31.212440100308488), z_dir=(1, 0, 0)), keep=Keep.TOP, mode=Mode.PRIVATE)
    with BuildSketch(Plane(origin=(35.544649291999995, -16.214289653179637, -34.01224222456454), x_dir=(1, 0, 0), z_dir=(0, 0.9562105575422115, 0.29267963653936196))) as fillet_5_piece_10b_section:
        with BuildLine():
            CenterArc((FILLET_5_R, -FILLET_5_R), FILLET_5_R, 90, 90)
            Line((0, -FILLET_5_R), (0, 0))
            Line((0, 0), (FILLET_5_R, 0))
        make_face()
    fillet_5_piece_10b = extrude(amount=10.778973849495781, mode=Mode.PRIVATE)
    fillet_5_piece_10b = split(fillet_5_piece_10b, bisect_by=Plane(origin=(35.79978563333149, -8.560805355999998, -31.018501317013552), z_dir=(0, 1, 0)), keep=Keep.TOP, mode=Mode.PRIVATE)
    fillet_5_piece_10 = fillet_5_piece_10a & fillet_5_piece_10b
    add(fillet_5_piece_10, mode=Mode.SUBTRACT)
    with BuildSketch(Plane(origin=(35.544649291999995, -16.214289653179637, -34.01224222456454), x_dir=(1, 0, 0), z_dir=(0, 0.9562105575422115, 0.29267963653936196))) as fillet_5_piece_11a_section:
        with BuildLine():
            CenterArc((FILLET_5_R, -FILLET_5_R), FILLET_5_R, 90, 90)
            Line((0, -FILLET_5_R), (0, 0))
            Line((0, 0), (FILLET_5_R, 0))
        make_face()
    fillet_5_piece_11a = extrude(amount=10.778973849495781, mode=Mode.PRIVATE)
    fillet_5_piece_11a = split(fillet_5_piece_11a, bisect_by=Plane(origin=(35.79231711859715, -13.560805356, -33.34844666341147), z_dir=(0, -1, 0)), keep=Keep.TOP, mode=Mode.PRIVATE)
    with BuildSketch(Plane(origin=(5.544649291999988, -13.560805356, -33.200056233167814), x_dir=(0, -0.9562105575422132, -0.29267963653935636), z_dir=(1, 0, 0))) as fillet_5_piece_11b_section:
        with BuildLine():
            CenterArc((FILLET_5_R * 0.73971193675, -FILLET_5_R), FILLET_5_R, 90.0000000000003, 72.98154974949095)
            Line((-FILLET_5_R * 0.216498620792, -FILLET_5_R * 0.707320363461), (0, 0))
            Line((0, 0), (FILLET_5_R * 0.73971193675, -2e-17))
        make_face()
    fillet_5_piece_11b = extrude(amount=32.05270062448211, mode=Mode.PRIVATE)
    fillet_5_piece_11b = split(fillet_5_piece_11b, bisect_by=Plane(origin=(35.544649291999995, -13.733631636877405, -33.072214570218634), z_dir=(1, 0, 0)), keep=Keep.TOP, mode=Mode.PRIVATE)
    fillet_5_piece_11 = fillet_5_piece_11a & fillet_5_piece_11b
    add(fillet_5_piece_11, mode=Mode.SUBTRACT)


solid = part_1.part
